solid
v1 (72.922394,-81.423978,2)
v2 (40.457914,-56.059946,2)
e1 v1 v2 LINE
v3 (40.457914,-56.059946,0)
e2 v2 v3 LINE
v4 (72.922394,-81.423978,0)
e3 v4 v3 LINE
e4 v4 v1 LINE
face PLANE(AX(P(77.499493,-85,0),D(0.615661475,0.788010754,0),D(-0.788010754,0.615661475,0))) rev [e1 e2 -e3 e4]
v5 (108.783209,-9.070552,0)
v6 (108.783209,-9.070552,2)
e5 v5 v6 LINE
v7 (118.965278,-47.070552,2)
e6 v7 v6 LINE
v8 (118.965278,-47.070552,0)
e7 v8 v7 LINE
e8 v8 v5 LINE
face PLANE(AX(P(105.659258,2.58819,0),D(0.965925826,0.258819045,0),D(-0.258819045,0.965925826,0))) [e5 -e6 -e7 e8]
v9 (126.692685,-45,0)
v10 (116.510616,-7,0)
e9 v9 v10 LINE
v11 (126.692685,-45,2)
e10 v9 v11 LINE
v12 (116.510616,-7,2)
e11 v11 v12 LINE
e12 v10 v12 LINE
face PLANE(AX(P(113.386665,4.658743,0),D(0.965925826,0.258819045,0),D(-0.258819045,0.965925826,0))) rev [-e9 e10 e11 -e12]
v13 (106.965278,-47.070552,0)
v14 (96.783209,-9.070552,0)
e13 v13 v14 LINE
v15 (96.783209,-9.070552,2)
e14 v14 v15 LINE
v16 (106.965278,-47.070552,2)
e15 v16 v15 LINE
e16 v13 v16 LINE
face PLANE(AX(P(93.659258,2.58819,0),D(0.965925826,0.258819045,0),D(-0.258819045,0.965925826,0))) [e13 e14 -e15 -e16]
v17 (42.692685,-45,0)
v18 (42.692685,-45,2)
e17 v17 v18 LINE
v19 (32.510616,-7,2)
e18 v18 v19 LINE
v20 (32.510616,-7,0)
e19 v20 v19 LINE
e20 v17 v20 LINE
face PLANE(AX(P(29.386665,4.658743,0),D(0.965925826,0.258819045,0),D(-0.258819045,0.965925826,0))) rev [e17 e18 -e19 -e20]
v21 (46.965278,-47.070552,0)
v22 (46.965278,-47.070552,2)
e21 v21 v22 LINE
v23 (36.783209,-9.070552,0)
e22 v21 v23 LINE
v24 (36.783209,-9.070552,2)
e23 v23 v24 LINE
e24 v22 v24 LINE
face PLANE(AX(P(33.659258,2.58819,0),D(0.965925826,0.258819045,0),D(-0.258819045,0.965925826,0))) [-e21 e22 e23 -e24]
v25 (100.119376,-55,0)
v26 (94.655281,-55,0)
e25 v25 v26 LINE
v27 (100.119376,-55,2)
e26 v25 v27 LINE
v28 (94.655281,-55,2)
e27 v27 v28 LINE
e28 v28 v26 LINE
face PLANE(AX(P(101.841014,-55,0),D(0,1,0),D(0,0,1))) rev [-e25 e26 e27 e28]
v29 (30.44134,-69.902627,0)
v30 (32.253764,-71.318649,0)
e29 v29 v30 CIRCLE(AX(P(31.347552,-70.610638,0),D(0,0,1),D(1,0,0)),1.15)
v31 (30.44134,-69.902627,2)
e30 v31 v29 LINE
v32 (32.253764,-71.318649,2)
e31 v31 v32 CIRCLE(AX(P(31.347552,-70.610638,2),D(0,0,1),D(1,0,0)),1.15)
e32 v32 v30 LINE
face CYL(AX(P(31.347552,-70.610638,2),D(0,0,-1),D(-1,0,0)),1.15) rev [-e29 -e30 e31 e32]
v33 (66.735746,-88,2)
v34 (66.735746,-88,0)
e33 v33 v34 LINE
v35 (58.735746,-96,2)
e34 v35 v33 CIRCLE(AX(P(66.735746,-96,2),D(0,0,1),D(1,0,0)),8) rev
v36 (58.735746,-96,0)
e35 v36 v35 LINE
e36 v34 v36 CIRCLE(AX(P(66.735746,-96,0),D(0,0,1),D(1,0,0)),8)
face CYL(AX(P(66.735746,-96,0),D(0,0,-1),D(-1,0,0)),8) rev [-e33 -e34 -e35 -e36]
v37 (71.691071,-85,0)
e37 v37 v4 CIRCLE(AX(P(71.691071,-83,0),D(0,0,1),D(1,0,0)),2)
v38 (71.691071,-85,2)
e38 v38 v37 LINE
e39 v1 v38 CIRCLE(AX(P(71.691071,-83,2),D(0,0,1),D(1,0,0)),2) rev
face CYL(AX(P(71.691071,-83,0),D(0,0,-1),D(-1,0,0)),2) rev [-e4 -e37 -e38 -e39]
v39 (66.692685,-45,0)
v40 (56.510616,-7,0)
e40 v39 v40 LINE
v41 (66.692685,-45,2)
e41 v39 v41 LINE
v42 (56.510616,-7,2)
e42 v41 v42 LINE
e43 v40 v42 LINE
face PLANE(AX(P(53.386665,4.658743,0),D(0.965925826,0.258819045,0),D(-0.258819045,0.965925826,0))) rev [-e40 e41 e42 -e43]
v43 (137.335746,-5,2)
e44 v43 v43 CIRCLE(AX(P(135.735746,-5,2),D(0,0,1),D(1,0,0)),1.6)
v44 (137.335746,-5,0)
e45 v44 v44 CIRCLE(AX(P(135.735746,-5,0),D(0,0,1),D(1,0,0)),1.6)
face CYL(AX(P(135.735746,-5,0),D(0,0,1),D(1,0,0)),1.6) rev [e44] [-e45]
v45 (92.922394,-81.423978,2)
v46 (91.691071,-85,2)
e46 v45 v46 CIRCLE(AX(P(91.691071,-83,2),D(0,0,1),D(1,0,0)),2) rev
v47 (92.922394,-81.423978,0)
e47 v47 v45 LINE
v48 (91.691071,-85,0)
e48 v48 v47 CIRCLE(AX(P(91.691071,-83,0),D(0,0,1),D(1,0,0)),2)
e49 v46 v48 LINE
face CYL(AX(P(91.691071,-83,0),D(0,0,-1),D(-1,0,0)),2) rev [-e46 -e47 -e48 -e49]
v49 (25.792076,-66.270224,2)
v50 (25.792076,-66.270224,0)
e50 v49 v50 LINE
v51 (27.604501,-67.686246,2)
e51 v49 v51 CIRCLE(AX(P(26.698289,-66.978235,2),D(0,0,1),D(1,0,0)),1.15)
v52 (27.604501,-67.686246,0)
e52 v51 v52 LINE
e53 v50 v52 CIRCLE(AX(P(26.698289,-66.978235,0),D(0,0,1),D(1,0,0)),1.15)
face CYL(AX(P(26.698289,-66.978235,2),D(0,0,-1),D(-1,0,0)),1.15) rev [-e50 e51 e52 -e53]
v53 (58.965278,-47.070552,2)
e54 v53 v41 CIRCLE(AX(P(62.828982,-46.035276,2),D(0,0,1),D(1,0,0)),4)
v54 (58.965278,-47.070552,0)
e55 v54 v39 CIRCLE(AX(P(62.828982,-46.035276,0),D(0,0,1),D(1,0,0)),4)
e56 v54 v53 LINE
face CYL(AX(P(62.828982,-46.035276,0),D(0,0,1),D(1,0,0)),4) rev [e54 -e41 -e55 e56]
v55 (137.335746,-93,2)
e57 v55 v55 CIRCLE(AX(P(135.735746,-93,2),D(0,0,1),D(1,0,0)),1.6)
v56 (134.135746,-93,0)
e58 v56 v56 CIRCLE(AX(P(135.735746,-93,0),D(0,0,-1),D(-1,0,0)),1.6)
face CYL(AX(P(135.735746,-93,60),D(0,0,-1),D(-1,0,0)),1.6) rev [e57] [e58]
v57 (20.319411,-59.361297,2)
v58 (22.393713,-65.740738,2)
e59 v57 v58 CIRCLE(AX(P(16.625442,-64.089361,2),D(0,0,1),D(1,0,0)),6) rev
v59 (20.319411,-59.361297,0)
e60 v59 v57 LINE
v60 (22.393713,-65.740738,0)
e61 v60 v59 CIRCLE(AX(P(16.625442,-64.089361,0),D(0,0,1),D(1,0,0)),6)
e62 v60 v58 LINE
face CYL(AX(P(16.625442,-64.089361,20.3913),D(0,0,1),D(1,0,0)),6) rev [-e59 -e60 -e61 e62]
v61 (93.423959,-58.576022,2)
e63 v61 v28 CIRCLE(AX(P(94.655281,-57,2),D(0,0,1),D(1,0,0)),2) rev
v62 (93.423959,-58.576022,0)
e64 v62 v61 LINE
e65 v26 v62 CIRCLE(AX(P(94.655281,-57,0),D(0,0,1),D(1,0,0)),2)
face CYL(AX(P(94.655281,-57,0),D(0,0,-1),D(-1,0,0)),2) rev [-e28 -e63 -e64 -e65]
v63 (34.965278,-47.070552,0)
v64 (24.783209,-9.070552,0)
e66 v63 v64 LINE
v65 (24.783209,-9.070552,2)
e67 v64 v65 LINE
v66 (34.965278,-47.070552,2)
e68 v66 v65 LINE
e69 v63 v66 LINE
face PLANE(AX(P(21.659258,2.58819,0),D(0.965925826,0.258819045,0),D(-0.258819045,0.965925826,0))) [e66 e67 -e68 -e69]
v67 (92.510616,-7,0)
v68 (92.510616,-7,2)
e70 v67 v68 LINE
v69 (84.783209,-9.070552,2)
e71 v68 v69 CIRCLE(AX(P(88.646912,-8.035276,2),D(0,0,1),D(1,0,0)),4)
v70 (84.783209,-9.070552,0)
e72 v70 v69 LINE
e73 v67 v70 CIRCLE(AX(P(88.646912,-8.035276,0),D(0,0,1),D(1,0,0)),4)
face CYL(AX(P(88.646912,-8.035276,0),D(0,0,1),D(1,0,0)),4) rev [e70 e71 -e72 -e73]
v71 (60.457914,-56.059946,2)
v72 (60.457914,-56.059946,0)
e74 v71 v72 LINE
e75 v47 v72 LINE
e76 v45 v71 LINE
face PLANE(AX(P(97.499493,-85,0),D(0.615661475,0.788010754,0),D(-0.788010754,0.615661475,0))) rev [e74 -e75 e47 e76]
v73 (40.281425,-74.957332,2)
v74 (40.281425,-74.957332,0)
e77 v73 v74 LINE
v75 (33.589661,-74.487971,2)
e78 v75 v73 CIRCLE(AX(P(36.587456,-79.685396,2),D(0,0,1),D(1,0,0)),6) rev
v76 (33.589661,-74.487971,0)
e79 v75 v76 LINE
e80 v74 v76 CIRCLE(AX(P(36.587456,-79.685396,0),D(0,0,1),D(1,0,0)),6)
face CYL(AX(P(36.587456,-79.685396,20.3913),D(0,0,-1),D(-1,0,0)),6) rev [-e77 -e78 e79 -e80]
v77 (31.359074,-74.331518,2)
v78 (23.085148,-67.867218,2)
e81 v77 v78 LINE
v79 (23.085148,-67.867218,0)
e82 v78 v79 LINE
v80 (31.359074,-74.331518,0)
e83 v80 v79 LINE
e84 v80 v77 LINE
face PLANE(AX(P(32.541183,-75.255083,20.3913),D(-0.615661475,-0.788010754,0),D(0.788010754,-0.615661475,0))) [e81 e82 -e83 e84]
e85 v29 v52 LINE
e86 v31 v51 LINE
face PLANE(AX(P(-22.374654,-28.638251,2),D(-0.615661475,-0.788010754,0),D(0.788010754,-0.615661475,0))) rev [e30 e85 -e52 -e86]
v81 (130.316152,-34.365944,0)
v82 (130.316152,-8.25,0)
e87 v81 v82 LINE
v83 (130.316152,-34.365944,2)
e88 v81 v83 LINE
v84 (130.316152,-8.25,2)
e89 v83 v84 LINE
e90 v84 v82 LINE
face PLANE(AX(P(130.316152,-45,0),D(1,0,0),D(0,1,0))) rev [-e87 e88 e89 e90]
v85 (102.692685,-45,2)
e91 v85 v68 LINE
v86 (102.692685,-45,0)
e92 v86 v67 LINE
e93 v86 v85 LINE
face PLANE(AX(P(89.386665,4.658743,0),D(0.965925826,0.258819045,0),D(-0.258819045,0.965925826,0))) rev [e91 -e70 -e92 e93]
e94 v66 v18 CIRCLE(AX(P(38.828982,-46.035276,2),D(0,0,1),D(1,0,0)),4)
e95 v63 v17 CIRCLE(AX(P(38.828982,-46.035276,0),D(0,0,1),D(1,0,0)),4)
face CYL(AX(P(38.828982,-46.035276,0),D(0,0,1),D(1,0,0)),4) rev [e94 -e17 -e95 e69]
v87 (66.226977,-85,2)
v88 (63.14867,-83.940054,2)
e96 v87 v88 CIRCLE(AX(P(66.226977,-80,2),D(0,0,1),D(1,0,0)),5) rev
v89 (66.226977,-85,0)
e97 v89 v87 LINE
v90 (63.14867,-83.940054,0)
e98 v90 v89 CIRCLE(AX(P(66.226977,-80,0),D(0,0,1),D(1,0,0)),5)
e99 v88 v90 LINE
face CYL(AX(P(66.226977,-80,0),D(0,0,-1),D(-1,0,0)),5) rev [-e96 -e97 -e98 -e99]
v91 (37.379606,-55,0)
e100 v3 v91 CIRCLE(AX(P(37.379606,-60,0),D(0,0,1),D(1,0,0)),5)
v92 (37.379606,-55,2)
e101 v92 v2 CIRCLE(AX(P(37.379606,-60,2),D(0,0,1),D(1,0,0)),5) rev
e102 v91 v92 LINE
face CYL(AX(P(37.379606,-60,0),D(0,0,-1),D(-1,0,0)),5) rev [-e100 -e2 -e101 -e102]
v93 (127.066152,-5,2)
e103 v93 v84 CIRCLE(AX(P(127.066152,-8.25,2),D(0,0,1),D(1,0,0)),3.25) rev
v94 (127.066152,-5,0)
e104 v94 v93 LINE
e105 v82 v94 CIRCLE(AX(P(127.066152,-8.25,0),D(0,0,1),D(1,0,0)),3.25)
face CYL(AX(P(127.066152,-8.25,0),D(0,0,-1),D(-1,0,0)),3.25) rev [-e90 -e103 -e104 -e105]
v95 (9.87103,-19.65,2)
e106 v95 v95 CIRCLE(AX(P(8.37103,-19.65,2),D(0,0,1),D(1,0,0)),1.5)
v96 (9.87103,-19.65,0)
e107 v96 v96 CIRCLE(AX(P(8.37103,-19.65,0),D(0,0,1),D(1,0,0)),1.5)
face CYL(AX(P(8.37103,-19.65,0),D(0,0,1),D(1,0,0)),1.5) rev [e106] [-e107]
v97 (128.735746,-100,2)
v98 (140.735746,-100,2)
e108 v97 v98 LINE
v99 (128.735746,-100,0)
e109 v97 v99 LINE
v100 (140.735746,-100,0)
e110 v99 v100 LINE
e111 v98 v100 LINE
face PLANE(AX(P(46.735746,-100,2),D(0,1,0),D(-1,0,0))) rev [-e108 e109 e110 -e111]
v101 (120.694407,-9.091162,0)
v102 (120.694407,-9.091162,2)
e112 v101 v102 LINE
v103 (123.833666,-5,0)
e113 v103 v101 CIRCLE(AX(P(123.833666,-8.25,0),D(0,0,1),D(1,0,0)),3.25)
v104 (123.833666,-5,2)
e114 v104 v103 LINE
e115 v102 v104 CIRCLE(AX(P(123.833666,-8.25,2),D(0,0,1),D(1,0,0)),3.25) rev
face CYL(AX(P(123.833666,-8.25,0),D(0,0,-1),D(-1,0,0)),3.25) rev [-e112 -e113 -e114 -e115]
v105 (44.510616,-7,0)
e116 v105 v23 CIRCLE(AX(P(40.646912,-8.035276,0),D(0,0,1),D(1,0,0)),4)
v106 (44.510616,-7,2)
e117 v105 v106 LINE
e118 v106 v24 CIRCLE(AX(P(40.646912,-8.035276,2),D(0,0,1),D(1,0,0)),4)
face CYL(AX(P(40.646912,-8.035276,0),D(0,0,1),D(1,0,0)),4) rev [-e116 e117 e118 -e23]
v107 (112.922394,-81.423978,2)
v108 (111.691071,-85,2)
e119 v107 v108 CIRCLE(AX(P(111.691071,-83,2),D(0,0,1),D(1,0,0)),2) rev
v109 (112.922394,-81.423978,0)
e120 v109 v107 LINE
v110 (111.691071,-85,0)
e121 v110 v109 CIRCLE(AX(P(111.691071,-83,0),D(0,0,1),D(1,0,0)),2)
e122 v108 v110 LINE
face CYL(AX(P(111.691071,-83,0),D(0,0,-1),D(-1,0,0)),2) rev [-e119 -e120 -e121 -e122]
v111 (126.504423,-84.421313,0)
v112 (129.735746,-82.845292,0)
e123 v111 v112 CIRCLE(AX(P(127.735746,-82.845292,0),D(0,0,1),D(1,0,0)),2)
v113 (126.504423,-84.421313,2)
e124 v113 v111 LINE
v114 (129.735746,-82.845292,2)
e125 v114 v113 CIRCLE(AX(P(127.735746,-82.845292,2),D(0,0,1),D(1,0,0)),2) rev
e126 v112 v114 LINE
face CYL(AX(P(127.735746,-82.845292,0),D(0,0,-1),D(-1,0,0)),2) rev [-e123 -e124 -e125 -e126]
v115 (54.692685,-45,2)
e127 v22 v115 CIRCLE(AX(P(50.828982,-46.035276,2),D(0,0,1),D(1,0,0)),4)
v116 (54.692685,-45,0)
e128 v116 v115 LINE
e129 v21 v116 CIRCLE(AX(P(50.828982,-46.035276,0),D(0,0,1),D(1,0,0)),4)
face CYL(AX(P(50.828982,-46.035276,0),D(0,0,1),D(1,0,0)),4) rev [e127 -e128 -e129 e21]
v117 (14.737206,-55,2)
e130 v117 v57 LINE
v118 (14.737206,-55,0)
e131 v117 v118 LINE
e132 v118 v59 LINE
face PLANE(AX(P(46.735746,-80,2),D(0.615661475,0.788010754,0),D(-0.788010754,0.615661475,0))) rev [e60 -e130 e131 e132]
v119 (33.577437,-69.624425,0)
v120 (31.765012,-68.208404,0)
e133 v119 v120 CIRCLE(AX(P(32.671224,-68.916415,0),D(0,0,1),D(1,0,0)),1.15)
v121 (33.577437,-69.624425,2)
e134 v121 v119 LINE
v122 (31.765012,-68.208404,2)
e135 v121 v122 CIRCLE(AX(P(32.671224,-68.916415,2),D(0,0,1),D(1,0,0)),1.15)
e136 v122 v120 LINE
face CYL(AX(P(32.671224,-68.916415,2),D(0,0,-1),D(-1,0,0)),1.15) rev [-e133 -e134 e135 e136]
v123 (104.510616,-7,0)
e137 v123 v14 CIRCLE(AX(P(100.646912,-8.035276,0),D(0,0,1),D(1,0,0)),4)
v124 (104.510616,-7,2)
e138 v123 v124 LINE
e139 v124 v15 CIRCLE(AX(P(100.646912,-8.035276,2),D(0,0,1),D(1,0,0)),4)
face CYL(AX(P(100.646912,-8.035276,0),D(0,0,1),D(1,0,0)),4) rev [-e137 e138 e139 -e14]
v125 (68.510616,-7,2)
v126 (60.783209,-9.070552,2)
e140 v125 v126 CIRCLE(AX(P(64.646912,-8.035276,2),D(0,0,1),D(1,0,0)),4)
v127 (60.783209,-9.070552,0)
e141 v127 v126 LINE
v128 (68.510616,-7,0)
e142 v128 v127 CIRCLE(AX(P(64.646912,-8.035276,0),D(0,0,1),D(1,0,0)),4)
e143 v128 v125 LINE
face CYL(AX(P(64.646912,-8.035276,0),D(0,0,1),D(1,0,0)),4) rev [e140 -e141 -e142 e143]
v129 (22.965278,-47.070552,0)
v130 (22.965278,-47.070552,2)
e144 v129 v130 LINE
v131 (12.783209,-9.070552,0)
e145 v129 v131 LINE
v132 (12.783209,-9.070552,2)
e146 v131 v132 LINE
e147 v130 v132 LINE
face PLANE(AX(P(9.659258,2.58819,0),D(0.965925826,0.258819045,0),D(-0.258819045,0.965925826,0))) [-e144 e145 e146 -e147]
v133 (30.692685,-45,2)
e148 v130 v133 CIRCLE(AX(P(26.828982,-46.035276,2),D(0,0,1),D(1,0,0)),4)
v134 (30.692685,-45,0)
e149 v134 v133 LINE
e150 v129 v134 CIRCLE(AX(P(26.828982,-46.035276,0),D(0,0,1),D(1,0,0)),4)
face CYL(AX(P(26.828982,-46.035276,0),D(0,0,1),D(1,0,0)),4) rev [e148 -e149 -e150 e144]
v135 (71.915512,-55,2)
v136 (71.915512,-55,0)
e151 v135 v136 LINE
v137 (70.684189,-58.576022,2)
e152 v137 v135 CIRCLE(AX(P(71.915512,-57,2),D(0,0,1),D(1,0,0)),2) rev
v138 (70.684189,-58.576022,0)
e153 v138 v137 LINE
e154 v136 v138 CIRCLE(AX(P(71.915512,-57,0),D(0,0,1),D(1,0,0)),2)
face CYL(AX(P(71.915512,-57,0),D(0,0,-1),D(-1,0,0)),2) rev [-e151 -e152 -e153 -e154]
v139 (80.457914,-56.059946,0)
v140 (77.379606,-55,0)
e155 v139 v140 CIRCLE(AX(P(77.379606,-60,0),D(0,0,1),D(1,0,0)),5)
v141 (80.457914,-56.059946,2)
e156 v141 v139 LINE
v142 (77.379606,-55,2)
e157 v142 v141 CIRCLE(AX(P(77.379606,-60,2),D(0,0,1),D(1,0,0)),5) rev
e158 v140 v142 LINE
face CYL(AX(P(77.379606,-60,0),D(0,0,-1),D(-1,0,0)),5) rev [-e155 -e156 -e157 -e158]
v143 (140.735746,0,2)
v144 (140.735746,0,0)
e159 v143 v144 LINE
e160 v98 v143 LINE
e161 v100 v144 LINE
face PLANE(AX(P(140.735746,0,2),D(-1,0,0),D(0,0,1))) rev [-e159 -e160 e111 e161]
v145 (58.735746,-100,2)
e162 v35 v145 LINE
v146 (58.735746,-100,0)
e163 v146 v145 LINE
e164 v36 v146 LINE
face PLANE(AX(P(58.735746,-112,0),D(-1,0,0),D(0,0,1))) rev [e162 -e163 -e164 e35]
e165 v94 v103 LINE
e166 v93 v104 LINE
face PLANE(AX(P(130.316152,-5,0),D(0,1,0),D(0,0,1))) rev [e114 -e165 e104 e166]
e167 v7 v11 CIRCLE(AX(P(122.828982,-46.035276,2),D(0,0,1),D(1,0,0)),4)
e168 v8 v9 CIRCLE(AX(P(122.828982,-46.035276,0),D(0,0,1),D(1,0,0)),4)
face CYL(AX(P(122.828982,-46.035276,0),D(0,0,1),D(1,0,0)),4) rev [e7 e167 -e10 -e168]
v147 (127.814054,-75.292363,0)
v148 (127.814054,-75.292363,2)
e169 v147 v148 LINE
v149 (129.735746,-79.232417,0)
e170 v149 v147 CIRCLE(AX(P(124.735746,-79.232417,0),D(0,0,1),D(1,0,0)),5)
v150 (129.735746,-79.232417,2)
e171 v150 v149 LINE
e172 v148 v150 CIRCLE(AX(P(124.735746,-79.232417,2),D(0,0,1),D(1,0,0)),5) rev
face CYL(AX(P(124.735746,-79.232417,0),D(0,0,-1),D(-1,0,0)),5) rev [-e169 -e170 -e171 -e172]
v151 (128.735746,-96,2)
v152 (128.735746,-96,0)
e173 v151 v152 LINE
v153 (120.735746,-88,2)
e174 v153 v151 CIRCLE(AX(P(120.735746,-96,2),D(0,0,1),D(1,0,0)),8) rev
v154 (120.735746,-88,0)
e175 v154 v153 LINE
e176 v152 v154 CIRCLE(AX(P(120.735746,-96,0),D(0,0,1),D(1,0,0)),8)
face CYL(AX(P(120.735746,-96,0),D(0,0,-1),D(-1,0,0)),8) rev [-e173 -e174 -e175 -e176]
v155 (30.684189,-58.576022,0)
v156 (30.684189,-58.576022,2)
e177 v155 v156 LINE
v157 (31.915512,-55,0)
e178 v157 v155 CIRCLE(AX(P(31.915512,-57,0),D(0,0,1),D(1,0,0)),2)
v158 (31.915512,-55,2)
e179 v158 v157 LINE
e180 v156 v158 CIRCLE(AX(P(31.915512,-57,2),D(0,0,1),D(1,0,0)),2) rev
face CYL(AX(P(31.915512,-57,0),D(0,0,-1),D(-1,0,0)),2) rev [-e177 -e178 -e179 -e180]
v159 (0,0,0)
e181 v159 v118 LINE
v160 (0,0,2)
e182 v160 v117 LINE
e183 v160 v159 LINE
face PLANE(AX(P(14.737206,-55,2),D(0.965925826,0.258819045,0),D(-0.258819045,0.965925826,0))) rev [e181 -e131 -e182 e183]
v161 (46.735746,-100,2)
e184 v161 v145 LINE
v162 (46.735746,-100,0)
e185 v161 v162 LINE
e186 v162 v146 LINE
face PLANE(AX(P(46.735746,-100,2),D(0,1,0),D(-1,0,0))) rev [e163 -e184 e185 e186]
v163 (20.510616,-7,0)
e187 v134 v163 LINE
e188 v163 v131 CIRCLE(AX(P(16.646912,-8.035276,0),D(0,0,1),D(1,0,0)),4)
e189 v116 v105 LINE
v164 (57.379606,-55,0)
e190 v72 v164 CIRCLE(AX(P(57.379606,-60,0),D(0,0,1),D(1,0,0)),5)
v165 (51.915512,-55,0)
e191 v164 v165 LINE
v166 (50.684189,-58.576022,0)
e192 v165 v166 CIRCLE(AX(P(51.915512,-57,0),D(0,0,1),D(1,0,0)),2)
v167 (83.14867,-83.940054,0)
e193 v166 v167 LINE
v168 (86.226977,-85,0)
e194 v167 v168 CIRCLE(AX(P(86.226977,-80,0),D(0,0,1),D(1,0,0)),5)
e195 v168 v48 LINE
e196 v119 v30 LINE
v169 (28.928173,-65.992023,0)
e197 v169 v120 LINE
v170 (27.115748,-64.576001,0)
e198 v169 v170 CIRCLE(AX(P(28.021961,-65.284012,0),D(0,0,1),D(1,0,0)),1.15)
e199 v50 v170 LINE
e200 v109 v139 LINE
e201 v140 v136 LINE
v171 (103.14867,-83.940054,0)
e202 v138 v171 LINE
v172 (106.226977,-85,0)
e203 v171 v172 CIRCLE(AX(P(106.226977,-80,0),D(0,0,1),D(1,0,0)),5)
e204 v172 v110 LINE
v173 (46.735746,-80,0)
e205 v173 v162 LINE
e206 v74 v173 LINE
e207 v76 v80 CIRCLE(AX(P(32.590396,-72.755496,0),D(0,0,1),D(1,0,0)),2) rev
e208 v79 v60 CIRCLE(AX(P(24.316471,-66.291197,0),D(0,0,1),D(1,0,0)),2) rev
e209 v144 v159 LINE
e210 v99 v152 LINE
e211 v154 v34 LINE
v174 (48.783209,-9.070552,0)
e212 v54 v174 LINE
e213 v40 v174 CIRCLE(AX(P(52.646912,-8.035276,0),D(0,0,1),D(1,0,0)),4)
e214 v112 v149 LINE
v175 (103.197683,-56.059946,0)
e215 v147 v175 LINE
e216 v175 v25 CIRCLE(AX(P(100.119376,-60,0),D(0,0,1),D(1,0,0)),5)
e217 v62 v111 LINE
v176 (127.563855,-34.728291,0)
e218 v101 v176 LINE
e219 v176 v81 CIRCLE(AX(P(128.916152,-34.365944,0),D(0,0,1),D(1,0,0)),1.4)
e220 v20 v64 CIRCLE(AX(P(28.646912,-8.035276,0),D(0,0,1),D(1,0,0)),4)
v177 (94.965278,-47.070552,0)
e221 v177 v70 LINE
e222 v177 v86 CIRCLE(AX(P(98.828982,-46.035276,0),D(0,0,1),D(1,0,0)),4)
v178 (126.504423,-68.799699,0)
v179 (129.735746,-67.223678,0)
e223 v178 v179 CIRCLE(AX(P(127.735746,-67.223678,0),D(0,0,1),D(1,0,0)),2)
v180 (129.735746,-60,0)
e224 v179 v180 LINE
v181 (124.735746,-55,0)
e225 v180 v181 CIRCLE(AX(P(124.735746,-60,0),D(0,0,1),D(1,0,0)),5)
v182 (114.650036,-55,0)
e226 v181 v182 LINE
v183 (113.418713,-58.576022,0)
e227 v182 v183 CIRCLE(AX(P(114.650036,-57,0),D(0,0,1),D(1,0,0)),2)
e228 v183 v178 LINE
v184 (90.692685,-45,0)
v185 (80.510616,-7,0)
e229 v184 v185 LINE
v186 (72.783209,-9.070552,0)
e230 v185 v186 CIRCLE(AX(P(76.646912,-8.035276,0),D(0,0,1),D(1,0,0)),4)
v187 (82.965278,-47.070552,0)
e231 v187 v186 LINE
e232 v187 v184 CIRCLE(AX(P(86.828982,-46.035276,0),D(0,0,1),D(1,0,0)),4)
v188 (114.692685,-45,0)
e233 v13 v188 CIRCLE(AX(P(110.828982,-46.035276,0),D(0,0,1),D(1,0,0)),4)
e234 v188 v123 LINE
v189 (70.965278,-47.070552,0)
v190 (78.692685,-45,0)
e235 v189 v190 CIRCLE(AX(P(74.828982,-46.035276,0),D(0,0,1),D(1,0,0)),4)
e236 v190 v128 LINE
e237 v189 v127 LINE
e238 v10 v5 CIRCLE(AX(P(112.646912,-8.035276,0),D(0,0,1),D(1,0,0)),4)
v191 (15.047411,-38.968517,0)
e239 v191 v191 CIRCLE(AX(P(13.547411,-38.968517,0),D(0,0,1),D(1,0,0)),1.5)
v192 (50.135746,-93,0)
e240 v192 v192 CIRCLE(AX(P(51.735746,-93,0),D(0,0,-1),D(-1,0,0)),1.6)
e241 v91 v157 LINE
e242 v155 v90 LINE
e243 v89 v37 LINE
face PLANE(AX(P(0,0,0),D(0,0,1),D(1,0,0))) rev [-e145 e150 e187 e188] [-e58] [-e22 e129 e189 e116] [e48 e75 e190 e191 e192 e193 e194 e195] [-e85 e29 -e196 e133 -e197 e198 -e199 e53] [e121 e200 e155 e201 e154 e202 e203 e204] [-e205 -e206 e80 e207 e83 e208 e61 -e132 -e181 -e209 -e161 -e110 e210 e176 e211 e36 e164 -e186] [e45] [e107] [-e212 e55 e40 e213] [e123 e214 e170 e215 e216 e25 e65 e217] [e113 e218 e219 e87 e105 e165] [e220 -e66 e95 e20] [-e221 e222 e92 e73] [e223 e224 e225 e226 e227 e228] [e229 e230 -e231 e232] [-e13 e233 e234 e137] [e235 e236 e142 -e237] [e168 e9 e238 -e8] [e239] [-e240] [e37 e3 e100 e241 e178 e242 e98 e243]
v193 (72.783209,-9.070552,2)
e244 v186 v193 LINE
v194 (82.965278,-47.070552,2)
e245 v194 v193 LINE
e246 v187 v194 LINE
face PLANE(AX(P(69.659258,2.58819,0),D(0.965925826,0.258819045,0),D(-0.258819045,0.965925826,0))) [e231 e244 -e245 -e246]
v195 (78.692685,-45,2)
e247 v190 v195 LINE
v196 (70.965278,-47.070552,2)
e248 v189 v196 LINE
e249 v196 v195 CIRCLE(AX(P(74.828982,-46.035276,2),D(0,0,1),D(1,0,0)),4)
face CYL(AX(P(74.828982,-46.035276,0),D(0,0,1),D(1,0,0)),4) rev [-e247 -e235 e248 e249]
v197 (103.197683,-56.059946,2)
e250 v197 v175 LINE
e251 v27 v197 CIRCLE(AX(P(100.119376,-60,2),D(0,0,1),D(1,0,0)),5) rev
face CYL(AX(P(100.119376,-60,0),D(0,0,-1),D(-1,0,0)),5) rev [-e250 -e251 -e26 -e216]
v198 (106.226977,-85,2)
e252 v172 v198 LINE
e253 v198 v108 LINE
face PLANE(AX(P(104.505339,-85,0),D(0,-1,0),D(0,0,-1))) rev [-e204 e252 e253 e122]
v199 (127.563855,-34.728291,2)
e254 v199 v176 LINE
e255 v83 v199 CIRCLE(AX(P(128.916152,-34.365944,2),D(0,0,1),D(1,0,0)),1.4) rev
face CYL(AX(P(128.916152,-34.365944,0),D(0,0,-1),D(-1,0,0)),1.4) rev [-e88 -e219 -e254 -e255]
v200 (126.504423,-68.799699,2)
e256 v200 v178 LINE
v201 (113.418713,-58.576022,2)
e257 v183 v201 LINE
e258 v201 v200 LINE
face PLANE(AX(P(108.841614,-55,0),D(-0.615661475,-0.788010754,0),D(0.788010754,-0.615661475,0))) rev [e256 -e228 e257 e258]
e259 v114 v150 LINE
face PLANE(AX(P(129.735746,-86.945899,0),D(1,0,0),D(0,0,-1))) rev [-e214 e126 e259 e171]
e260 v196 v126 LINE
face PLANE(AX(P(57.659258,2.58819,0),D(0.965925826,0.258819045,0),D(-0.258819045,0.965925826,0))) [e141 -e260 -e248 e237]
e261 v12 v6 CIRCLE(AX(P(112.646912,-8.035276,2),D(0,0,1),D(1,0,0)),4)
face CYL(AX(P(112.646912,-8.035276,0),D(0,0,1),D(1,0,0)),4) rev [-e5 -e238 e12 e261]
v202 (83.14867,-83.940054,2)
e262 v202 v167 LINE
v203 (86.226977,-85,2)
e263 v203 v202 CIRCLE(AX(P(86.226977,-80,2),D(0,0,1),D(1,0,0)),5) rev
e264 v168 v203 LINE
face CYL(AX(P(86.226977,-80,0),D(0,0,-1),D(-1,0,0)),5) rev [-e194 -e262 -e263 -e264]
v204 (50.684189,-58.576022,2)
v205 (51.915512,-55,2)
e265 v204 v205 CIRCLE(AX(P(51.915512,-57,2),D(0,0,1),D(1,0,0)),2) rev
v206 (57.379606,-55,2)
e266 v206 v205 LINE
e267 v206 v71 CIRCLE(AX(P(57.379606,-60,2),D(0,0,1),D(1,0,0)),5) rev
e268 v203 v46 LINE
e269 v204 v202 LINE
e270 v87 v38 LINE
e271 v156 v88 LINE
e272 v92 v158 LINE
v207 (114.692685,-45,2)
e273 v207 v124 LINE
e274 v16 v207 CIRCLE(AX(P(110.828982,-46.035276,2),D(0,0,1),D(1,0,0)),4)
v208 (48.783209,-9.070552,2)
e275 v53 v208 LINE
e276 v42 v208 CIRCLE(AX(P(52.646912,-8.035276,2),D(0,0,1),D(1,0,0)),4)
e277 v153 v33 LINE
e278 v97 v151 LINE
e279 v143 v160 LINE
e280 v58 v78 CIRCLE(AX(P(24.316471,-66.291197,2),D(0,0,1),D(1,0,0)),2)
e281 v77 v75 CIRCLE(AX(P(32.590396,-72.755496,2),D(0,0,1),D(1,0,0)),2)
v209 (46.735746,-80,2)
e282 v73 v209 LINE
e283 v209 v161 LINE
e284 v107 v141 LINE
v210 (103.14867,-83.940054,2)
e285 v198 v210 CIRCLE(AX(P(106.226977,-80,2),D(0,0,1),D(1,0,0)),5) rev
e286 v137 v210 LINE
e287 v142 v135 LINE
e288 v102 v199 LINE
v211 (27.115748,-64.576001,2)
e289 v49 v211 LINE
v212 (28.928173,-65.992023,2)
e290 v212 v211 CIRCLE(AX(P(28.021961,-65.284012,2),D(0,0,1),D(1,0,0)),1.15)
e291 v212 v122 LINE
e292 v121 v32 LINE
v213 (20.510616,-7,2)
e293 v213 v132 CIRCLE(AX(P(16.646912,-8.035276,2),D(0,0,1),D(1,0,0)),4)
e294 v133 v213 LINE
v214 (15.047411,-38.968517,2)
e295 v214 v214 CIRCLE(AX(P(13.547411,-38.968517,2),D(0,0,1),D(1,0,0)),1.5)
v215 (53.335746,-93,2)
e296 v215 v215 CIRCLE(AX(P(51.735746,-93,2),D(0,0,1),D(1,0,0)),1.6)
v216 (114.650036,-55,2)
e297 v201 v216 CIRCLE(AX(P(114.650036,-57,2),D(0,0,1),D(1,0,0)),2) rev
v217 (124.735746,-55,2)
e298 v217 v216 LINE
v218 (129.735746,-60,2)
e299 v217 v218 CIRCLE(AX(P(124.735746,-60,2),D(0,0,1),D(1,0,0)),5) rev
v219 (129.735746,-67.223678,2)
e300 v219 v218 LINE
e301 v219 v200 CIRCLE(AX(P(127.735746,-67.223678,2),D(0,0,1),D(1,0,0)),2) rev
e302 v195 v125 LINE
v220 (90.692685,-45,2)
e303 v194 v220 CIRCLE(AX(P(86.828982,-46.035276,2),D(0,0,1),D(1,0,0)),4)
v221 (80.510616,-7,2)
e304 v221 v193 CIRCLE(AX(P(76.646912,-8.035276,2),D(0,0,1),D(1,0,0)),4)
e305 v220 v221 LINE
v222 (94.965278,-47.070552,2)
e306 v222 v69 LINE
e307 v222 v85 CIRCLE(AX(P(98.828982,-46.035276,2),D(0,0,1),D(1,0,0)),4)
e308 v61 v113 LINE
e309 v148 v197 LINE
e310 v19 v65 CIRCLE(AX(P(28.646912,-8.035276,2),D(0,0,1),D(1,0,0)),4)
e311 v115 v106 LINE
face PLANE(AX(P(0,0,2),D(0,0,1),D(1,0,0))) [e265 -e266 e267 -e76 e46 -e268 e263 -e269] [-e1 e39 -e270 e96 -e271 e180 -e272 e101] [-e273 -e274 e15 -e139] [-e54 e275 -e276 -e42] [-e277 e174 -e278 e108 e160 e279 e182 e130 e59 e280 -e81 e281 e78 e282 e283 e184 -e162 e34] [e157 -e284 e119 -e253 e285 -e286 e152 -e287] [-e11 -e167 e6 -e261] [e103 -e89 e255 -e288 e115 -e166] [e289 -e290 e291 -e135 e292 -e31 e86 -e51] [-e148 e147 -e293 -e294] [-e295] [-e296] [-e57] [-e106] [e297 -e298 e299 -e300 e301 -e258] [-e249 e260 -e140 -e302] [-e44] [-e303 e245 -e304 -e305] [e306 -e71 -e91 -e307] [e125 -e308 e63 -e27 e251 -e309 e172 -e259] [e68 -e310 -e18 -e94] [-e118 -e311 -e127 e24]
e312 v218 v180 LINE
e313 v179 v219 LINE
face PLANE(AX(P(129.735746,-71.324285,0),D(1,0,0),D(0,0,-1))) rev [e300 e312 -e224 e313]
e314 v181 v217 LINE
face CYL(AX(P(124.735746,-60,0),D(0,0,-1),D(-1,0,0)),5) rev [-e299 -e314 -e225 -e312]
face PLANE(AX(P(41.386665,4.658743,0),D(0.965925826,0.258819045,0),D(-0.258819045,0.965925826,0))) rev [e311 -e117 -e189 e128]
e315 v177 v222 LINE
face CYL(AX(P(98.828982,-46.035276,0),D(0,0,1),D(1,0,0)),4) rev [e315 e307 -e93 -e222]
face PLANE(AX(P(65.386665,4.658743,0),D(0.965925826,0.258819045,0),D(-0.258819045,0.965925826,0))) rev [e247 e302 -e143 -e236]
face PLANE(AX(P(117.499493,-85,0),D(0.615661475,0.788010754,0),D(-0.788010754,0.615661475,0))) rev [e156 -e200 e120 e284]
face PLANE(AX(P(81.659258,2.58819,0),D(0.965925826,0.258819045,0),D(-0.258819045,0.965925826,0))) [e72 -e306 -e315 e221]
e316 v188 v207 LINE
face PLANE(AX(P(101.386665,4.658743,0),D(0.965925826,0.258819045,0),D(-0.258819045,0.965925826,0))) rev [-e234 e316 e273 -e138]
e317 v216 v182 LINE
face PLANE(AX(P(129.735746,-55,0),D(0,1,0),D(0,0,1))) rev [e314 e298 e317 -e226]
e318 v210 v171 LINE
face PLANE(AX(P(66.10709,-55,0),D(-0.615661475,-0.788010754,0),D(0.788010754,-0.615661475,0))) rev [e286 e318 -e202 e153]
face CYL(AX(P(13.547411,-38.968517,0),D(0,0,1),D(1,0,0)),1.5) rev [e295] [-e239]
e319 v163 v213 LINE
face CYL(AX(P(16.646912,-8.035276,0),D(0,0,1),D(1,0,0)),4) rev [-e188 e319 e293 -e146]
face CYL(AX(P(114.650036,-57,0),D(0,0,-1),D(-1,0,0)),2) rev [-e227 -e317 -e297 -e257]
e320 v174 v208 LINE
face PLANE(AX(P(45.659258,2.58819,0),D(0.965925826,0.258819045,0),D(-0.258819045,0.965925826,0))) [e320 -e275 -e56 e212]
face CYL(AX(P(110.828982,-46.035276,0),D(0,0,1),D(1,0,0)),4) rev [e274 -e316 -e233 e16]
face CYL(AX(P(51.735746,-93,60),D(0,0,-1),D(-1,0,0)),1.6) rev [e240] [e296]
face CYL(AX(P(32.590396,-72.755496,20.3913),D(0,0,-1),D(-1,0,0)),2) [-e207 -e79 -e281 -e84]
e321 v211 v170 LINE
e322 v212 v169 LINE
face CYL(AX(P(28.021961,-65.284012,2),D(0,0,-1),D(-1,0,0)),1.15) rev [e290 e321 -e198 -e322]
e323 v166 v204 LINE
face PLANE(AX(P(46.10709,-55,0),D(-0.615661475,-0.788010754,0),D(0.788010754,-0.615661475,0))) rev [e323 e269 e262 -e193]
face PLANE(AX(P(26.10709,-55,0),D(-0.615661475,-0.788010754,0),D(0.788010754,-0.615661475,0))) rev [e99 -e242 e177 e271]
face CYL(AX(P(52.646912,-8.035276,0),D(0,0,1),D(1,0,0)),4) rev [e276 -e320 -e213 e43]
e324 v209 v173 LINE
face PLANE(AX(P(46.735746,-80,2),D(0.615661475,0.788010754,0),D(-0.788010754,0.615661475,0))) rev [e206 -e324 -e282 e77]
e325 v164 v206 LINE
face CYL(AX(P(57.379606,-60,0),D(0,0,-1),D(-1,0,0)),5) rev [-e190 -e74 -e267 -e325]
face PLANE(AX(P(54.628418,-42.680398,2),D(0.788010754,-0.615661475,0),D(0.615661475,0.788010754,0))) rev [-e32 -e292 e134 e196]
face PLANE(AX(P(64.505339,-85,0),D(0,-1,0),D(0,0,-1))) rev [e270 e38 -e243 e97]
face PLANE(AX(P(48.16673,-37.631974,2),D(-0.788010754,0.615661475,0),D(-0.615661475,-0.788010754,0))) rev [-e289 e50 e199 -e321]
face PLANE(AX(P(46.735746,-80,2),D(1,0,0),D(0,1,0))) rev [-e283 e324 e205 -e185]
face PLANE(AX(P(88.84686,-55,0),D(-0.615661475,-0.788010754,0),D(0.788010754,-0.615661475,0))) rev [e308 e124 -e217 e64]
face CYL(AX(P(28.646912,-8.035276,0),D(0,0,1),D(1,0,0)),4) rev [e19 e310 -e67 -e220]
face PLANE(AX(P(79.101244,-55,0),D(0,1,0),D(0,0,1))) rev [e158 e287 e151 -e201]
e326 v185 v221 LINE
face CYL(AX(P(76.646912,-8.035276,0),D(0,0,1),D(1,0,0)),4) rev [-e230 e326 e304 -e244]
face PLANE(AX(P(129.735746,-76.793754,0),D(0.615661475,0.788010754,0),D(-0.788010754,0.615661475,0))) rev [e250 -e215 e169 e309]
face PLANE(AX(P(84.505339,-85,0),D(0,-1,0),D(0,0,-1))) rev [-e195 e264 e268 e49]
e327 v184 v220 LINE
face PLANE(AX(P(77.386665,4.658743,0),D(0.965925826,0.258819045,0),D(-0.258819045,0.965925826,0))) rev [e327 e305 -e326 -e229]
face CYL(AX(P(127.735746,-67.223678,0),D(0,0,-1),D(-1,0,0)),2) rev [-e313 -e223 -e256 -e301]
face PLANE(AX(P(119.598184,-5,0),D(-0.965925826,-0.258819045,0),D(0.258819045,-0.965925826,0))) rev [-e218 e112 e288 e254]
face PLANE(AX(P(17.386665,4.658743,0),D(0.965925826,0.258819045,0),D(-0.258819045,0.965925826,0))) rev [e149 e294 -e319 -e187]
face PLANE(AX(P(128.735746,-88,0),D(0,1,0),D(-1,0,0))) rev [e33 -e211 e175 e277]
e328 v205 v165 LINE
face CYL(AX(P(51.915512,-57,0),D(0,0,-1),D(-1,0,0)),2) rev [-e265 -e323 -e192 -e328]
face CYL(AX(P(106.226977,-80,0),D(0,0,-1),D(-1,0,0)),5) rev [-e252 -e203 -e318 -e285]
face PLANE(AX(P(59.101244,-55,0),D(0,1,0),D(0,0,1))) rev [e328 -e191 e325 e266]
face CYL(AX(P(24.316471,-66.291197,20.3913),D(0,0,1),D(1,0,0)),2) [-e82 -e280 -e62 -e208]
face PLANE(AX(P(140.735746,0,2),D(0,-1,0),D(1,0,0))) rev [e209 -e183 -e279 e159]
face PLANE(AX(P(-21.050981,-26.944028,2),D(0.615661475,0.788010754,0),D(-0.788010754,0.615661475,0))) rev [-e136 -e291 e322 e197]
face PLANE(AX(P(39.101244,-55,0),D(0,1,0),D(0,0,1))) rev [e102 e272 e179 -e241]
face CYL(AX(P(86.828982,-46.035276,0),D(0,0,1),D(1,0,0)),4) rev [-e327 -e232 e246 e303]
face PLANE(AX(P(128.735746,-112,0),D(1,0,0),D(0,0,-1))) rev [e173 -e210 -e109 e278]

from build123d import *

# Parameters (mm, degrees)
EXTRUDE_1_DEPTH                = 2
SKETCH_2_R                     = 1.6
CUT_EXTRUDE_1_DEPTH            = 60
CUT_EXTRUDE_3_DEPTH            = 173.657320469
PATTERN_LINEAR_1_COUNT         = 9
PATTERN_LINEAR_1_PITCH         = 12
CUT_EXTRUDE_4_DEPTH            = 173.657320469
FILLET_1_R                     = 3.25
FILLET_2_R                     = 1.4
SKETCH_8_R                     = 1.5
CUT_EXTRUDE_6_DEPTH            = 173.657320469
SKETCH_12_R                    = 1.6
CUT_EXTRUDE_9_DEPTH            = 173.657320469
SKETCH_15_W                    = 70
SKETCH_15_H                    = 24
CUT_EXTRUDE_13_DEPTH           = 173.657320469
FILLET_10_R                    = 8
CUT_EXTRUDE_11_DEPTH           = 173.657320469
FILLET_5_R                     = 2
FILLET_6_R                     = 5
PATTERN_LINEAR_2_COUNT         = 3
PATTERN_LINEAR_2_PITCH         = 20
FILLET_5_OF_PATTERN_LINEAR_2_R = 2
FILLET_6_OF_PATTERN_LINEAR_2_R = 5
CUT_EXTRUDE_12_DEPTH           = 173.657320469
FILLET_8_R                     = 2
FILLET_9_R                     = 5
EXTRUDE_6_DEPTH                = 2
SKETCH_17_R                    = 1.15
CUT_EXTRUDE_16_DEPTH           = 173.657320469
FILLET_11_R                    = 6
FILLET_12_R                    = 2


with BuildPart() as part:
    # 草图1 → 凸台-拉伸1 (new body)
    with BuildSketch(Plane.XY):
        Polygon((46.735746389, -100), (140.735746389, -100), (140.735746389, 0), (0, 0), (14.737205584, -55), (46.735746389, -80), align=None)
    extrude(amount=EXTRUDE_1_DEPTH)

    # 草图2 → 切除-拉伸1 (cut)
    with BuildSketch(Plane(origin=(0, 0, 0), x_dir=(-1, 0, 0), z_dir=(0, 0, -1))):
        with Locations((-135.735746389, -93)):
            Circle(SKETCH_2_R)
        with Locations((-51.735746389, -93)):
            Circle(SKETCH_2_R)
    extrude(amount=-CUT_EXTRUDE_1_DEPTH, mode=Mode.SUBTRACT)

    # 草图5 → 切除-拉伸3 (cut, through all)
    with BuildSketch(Plane.XY.offset(2)):
        with BuildLine():
            ThreePointArc((22.965278296, -47.070552361), (25.793705421, -42.171572875), (30.692684907, -45))
            Line((30.692684907, -45), (20.510615594, -7))
            ThreePointArc((20.510615594, -7), (20.612691735, -7.513171412), (20.646912289, -8.03527618))
            ThreePointArc((20.646912289, -8.03527618), (17.169017058, -12.001055626), (12.783208984, -9.070552361))
            Line((12.783208984, -9.070552361), (22.965278296, -47.070552361))
        make_face()
        with BuildLine():
            ThreePointArc((20.646912289, -8.03527618), (20.612691735, -7.513171412), (20.510615594, -7))
            Line((20.510615594, -7), (12.783208984, -9.070552361))
            ThreePointArc((12.783208984, -9.070552361), (17.169017058, -12.001055626), (20.646912289, -8.03527618))
        make_face()
        with BuildLine():
            Line((12.783208984, -9.070552361), (20.510615594, -7))
            ThreePointArc((20.510615594, -7), (15.611636109, -4.171572875), (12.783208984, -9.070552361))
        make_face()
        with BuildLine():
            ThreePointArc((30.828981602, -46.03527618), (30.794761047, -45.513171412), (30.692684907, -45))
            Line((30.692684907, -45), (22.965278296, -47.070552361))
            ThreePointArc((22.965278296, -47.070552361), (27.351086371, -50.001055626), (30.828981602, -46.03527618))
        make_face()
        with BuildLine():
            Line((22.965278296, -47.070552361), (30.692684907, -45))
            ThreePointArc((30.692684907, -45), (25.793705421, -42.171572875), (22.965278296, -47.070552361))
        make_face()
    cut_extrude_3 = extrude(amount=-CUT_EXTRUDE_3_DEPTH, mode=Mode.SUBTRACT)

    # 阵列(线性)1: 切除-拉伸3 ×9
    with Locations(*[(i * PATTERN_LINEAR_1_PITCH, 0, 0) for i in range(1, PATTERN_LINEAR_1_COUNT)]):
        add(cut_extrude_3, mode=Mode.SUBTRACT)

    # 草图6 → 切除-拉伸4 (cut, through all)
    with BuildSketch(Plane.XY.offset(2)):
        Polygon((119.598183841, -5), (130.316151538, -45), (130.316151538, -5), align=None)
    extrude(amount=-CUT_EXTRUDE_4_DEPTH, mode=Mode.SUBTRACT)

    # 圆角1
    fillet_1_edges = [part.edges().sort_by_distance(p)[0] for p in [
        (119.598183841, -5, 1),
        (130.316151538, -5, 1),
    ]]
    fillet(fillet_1_edges, radius=FILLET_1_R)

    # 圆角2
    fillet_2_edges = [part.edges().sort_by_distance(p)[0] for p in [
        (130.316151538, -45, 1),
    ]]
    fillet(fillet_2_edges, radius=FILLET_2_R)

    # 草图8 → 切除-拉伸6 (cut, through all)
    with BuildSketch(Plane.XY.offset(2)):
        with Locations((8.371030173, -19.65)):
            Circle(SKETCH_8_R)
        with Locations((13.547411075, -38.968516526)):
            Circle(SKETCH_8_R)
    extrude(amount=-CUT_EXTRUDE_6_DEPTH, mode=Mode.SUBTRACT)

    # 草图12 → 切除-拉伸9 (cut, through all)
    with BuildSketch(Plane.XY.offset(2)):
        with Locations((135.735746389, -5)):
            Circle(SKETCH_12_R)
    extrude(amount=-CUT_EXTRUDE_9_DEPTH, mode=Mode.SUBTRACT)

    # 草图15 → 切除-拉伸13 (cut, through all)
    with BuildSketch(Plane.XY.offset(2)):
        with Locations((93.735746389, -100)):
            Rectangle(SKETCH_15_W, SKETCH_15_H)
    extrude(amount=-CUT_EXTRUDE_13_DEPTH, mode=Mode.SUBTRACT)

    # 圆角10
    fillet_10_edges = [part.edges().sort_by_distance(p)[0] for p in [
        (128.735746389, -88, 1),
        (58.735746389, -88, 1),
    ]]
    fillet(fillet_10_edges, radius=FILLET_10_R)

    # 草图13 → 切除-拉伸11 (cut, through all)
    with BuildSketch(Plane.XY.offset(2)):
        Polygon((26.107090302, -55), (64.505339268, -85), (77.499493232, -85), (39.101244266, -55), align=None)
    cut_extrude_11 = extrude(amount=-CUT_EXTRUDE_11_DEPTH, mode=Mode.SUBTRACT)

    # 圆角5
    fillet_5_edges = [part.edges().sort_by_distance(p)[0] for p in [
        (26.107090302, -55, 1),
        (77.499493232, -85, 1),
    ]]
    fillet(fillet_5_edges, radius=FILLET_5_R)

    # 圆角6
    fillet_6_edges = [part.edges().sort_by_distance(p)[0] for p in [
        (39.101244266, -55, 1),
        (64.505339268, -85, 1),
    ]]
    fillet(fillet_6_edges, radius=FILLET_6_R)

    # 阵列(线性)2: 切除-拉伸11 ×3
    with Locations(*[(i * PATTERN_LINEAR_2_PITCH, 0, 0) for i in range(1, PATTERN_LINEAR_2_COUNT)]):
        add(cut_extrude_11, mode=Mode.SUBTRACT)

    # 圆角5 of 阵列(线性)2
    fillet_5_of_pattern_linear_2_edges = [part.edges().sort_by_distance(p)[0] for p in [
        (46.107090302, -55, 1),
        (97.499493232, -85, 1),
        (66.107090302, -55, 1),
        (117.499493232, -85, 1),
    ]]
    fillet(fillet_5_of_pattern_linear_2_edges, radius=FILLET_5_OF_PATTERN_LINEAR_2_R)

    # 圆角6 of 阵列(线性)2
    fillet_6_of_pattern_linear_2_edges = [part.edges().sort_by_distance(p)[0] for p in [
        (59.101244266, -55, 1),
        (84.505339268, -85, 1),
        (79.101244266, -55, 1),
        (104.505339268, -85, 1),
    ]]
    fillet(fillet_6_of_pattern_linear_2_edges, radius=FILLET_6_OF_PATTERN_LINEAR_2_R)

    # 草图14 → 切除-拉伸12 (cut, through all)
    with BuildSketch(Plane.XY.offset(2)):
        Polygon((88.846859739, -55), (129.735746389, -86.945899423), (129.735746389, -76.793753703), (101.841013703, -55), align=None)
        Polygon((108.841614151, -55), (129.735746389, -71.324285196), (129.735746389, -55), align=None)
    extrude(amount=-CUT_EXTRUDE_12_DEPTH, mode=Mode.SUBTRACT)

    # 圆角8
    fillet_8_edges = [part.edges().sort_by_distance(p)[0] for p in [
        (108.841614151, -55, 1),
        (129.735746389, -71.324285196, 1),
        (88.846859739, -55, 1),
        (129.735746389, -86.945899423, 1),
    ]]
    fillet(fillet_8_edges, radius=FILLET_8_R)

    # 圆角9
    fillet_9_edges = [part.edges().sort_by_distance(p)[0] for p in [
        (129.735746389, -55, 1),
        (101.841013703, -55, 1),
        (129.735746389, -76.793753703, 1),
    ]]
    fillet(fillet_9_edges, radius=FILLET_9_R)

    # 草图18 → 凸台-拉伸6 (add)
    with BuildSketch(Plane(origin=(0, 0, 0), x_dir=(-1, 0, 0), z_dir=(0, 0, -1))):
        Polygon((-35.619490554, -71.315029096), (-32.541183178, -75.255082864), (-21.903038004, -66.943652947), (-24.981345381, -63.003599179), align=None)
    extrude(amount=-EXTRUDE_6_DEPTH)

    # 草图17 → 切除-拉伸16 (cut, through all)
    with BuildSketch(Plane.XY):
        with BuildLine():
            ThreePointArc((29.171960855, -65.284011979), (28.396364233, -64.196665617), (27.115748488, -64.576001282))
            Line((27.115748488, -64.576001282), (28.928173222, -65.992022676))
            ThreePointArc((28.928173222, -65.992022676), (29.109307217, -65.658415357), (29.171960855, -65.284011979))
        make_face()
        with BuildLine():
            Line((28.928173222, -65.992022676), (27.115748488, -64.576001282))
            ThreePointArc((27.115748488, -64.576001282), (26.87398919, -65.215740047), (27.038219724, -65.879623754))
            ThreePointArc((27.038219724, -65.879623754), (27.40629938, -66.072022733), (27.682029814, -66.382623324))
            ThreePointArc((27.682029814, -66.382623324), (28.3659243, -66.381367504), (28.928173222, -65.992022676))
        make_face()
        with BuildLine():
            ThreePointArc((27.038219724, -65.879623754), (26.87398919, -65.215740047), (27.115748488, -64.576001282))
            Line((27.115748488, -64.576001282), (25.792076316, -66.270224403))
            ThreePointArc((25.792076316, -66.270224403), (26.354325238, -65.880879574), (27.038219724, -65.879623754))
        make_face()
        with BuildLine():
            ThreePointArc((27.038219724, -65.879623754), (26.354325238, -65.880879574), (25.792076316, -66.270224403))
            Line((25.792076316, -66.270224403), (27.60450105, -67.686245796))
            ThreePointArc((27.60450105, -67.686245796), (27.785635045, -67.352638477), (27.848288683, -66.978235099))
            ThreePointArc((27.848288683, -66.978235099), (27.805944383, -66.669044463), (27.682029814, -66.382623324))
            ThreePointArc((27.682029814, -66.382623324), (27.313950158, -66.190224346), (27.038219724, -65.879623754))
        make_face()
        with BuildLine():
            Line((27.60450105, -67.686245796), (25.792076316, -66.270224403))
            ThreePointArc((25.792076316, -66.270224403), (25.990277986, -67.884447466), (27.60450105, -67.686245796))
        make_face()
        with Locations((26.698288683, -66.978235099)):
            Circle(SKETCH_17_R)
        with Locations((28.021960855, -65.284011979)):
            Circle(SKETCH_17_R)
        with BuildLine():
            Line((31.765011935, -68.208403987), (28.928173222, -65.992022676))
            ThreePointArc((28.928173222, -65.992022676), (28.3659243, -66.381367504), (27.682029814, -66.382623324))
            ThreePointArc((27.682029814, -66.382623324), (27.805944383, -66.669044463), (27.848288683, -66.978235099))
            ThreePointArc((27.848288683, -66.978235099), (27.785635045, -67.352638477), (27.60450105, -67.686245796))
            Line((27.60450105, -67.686245796), (30.441339763, -69.902627107))
            ThreePointArc((30.441339763, -69.902627107), (31.003588684, -69.513282279), (31.68748317, -69.512026459))
            ThreePointArc((31.68748317, -69.512026459), (31.523252636, -68.848142751), (31.765011935, -68.208403987))
        make_face()
        with BuildLine():
            Line((33.577436668, -69.62442538), (31.765011935, -68.208403987))
            ThreePointArc((31.765011935, -68.208403987), (31.523252636, -68.848142751), (31.68748317, -69.512026459))
            ThreePointArc((31.68748317, -69.512026459), (32.055562826, -69.704425437), (32.331293261, -70.015026028))
            ThreePointArc((32.331293261, -70.015026028), (33.015187746, -70.013770208), (33.577436668, -69.62442538))
        make_face()
        with BuildLine():
            ThreePointArc((32.331293261, -70.015026028), (31.963213605, -69.82262705), (31.68748317, -69.512026459))
            ThreePointArc((31.68748317, -69.512026459), (31.003588684, -69.513282279), (30.441339763, -69.902627107))
            Line((30.441339763, -69.902627107), (32.253764496, -71.3186485))
            ThreePointArc((32.253764496, -71.3186485), (32.434898491, -70.985041181), (32.497552129, -70.610637804))
            ThreePointArc((32.497552129, -70.610637804), (32.45520783, -70.301447167), (32.331293261, -70.015026028))
        make_face()
        with BuildLine():
            ThreePointArc((33.821224301, -68.916414683), (33.045627679, -67.829068321), (31.765011935, -68.208403987))
            Line((31.765011935, -68.208403987), (33.577436668, -69.62442538))
            ThreePointArc((33.577436668, -69.62442538), (33.758570663, -69.290818061), (33.821224301, -68.916414683))
        make_face()
        with BuildLine():
            Line((32.253764496, -71.3186485), (30.441339763, -69.902627107))
            ThreePointArc((30.441339763, -69.902627107), (30.639541433, -71.51685017), (32.253764496, -71.3186485))
        make_face()
        with BuildLine():
            Line((32.253764496, -71.3186485), (33.577436668, -69.62442538))
            ThreePointArc((33.577436668, -69.62442538), (33.015187746, -70.013770208), (32.331293261, -70.015026028))
            ThreePointArc((32.331293261, -70.015026028), (32.45520783, -70.301447167), (32.497552129, -70.610637804))
            ThreePointArc((32.497552129, -70.610637804), (32.434898491, -70.985041181), (32.253764496, -71.3186485))
        make_face()
        with Locations((32.671224301, -68.916414683)):
            Circle(SKETCH_17_R)
        with Locations((31.347552129, -70.610637804)):
            Circle(SKETCH_17_R)
    extrude(amount=CUT_EXTRUDE_16_DEPTH, mode=Mode.SUBTRACT)

    # 圆角11
    # the kernel refuses this fillet: 6 mm, written as the material it adds along each edge
    with BuildSketch(Plane(origin=(24.981345381, -63.003599179, 0), x_dir=(-0.7880107536067251, 0.6156614753256543, 0), z_dir=(0, 0, 1))) as fillet_11_piece_1:
        with BuildLine():
            CenterArc((5.916079783, 6), FILLET_11_R, 189.594068227, 80.405931773)
            Line((0, 5), (-0.118321596, 4.98))
            ThreePointArc((-0.118321596, 4.98), (-0.12, 2.5), (-0.12, 0))
            Line((-0.12, 0), (0, -0.12))
            Line((0, -0.12), (5.916079783, -0.12))
            Line((5.916079783, -0.12), (5.916079783, 0))
        make_face()
    extrude(amount=2)
    with BuildSketch(Plane(origin=(35.619490554, -71.315029096, 0), x_dir=(0.7880107536067248, -0.6156614753256546, 0), z_dir=(0, 0, 1))) as fillet_11_piece_2:
        with BuildLine():
            CenterArc((5.916079783, -6), FILLET_11_R, 90, 80.405931773)
            Line((0, -5), (-0.118321596, -4.98))
            ThreePointArc((-0.118321596, -4.98), (-0.12, -2.5), (-0.12, 0))
            Line((-0.12, 0), (0, 0.12))
            Line((0, 0.12), (5.916079783, 0.12))
            Line((5.916079783, 0.12), (5.916079783, 0))
        make_face()
    extrude(amount=2)

    # 圆角12
    fillet_12_edges = [part.edges().sort_by_distance(p)[0] for p in [
        (32.541183178, -75.255082864, 1),
        (21.903038004, -66.943652947, 1),
    ]]
    fillet(fillet_12_edges, radius=FILLET_12_R)


solid = part.part
